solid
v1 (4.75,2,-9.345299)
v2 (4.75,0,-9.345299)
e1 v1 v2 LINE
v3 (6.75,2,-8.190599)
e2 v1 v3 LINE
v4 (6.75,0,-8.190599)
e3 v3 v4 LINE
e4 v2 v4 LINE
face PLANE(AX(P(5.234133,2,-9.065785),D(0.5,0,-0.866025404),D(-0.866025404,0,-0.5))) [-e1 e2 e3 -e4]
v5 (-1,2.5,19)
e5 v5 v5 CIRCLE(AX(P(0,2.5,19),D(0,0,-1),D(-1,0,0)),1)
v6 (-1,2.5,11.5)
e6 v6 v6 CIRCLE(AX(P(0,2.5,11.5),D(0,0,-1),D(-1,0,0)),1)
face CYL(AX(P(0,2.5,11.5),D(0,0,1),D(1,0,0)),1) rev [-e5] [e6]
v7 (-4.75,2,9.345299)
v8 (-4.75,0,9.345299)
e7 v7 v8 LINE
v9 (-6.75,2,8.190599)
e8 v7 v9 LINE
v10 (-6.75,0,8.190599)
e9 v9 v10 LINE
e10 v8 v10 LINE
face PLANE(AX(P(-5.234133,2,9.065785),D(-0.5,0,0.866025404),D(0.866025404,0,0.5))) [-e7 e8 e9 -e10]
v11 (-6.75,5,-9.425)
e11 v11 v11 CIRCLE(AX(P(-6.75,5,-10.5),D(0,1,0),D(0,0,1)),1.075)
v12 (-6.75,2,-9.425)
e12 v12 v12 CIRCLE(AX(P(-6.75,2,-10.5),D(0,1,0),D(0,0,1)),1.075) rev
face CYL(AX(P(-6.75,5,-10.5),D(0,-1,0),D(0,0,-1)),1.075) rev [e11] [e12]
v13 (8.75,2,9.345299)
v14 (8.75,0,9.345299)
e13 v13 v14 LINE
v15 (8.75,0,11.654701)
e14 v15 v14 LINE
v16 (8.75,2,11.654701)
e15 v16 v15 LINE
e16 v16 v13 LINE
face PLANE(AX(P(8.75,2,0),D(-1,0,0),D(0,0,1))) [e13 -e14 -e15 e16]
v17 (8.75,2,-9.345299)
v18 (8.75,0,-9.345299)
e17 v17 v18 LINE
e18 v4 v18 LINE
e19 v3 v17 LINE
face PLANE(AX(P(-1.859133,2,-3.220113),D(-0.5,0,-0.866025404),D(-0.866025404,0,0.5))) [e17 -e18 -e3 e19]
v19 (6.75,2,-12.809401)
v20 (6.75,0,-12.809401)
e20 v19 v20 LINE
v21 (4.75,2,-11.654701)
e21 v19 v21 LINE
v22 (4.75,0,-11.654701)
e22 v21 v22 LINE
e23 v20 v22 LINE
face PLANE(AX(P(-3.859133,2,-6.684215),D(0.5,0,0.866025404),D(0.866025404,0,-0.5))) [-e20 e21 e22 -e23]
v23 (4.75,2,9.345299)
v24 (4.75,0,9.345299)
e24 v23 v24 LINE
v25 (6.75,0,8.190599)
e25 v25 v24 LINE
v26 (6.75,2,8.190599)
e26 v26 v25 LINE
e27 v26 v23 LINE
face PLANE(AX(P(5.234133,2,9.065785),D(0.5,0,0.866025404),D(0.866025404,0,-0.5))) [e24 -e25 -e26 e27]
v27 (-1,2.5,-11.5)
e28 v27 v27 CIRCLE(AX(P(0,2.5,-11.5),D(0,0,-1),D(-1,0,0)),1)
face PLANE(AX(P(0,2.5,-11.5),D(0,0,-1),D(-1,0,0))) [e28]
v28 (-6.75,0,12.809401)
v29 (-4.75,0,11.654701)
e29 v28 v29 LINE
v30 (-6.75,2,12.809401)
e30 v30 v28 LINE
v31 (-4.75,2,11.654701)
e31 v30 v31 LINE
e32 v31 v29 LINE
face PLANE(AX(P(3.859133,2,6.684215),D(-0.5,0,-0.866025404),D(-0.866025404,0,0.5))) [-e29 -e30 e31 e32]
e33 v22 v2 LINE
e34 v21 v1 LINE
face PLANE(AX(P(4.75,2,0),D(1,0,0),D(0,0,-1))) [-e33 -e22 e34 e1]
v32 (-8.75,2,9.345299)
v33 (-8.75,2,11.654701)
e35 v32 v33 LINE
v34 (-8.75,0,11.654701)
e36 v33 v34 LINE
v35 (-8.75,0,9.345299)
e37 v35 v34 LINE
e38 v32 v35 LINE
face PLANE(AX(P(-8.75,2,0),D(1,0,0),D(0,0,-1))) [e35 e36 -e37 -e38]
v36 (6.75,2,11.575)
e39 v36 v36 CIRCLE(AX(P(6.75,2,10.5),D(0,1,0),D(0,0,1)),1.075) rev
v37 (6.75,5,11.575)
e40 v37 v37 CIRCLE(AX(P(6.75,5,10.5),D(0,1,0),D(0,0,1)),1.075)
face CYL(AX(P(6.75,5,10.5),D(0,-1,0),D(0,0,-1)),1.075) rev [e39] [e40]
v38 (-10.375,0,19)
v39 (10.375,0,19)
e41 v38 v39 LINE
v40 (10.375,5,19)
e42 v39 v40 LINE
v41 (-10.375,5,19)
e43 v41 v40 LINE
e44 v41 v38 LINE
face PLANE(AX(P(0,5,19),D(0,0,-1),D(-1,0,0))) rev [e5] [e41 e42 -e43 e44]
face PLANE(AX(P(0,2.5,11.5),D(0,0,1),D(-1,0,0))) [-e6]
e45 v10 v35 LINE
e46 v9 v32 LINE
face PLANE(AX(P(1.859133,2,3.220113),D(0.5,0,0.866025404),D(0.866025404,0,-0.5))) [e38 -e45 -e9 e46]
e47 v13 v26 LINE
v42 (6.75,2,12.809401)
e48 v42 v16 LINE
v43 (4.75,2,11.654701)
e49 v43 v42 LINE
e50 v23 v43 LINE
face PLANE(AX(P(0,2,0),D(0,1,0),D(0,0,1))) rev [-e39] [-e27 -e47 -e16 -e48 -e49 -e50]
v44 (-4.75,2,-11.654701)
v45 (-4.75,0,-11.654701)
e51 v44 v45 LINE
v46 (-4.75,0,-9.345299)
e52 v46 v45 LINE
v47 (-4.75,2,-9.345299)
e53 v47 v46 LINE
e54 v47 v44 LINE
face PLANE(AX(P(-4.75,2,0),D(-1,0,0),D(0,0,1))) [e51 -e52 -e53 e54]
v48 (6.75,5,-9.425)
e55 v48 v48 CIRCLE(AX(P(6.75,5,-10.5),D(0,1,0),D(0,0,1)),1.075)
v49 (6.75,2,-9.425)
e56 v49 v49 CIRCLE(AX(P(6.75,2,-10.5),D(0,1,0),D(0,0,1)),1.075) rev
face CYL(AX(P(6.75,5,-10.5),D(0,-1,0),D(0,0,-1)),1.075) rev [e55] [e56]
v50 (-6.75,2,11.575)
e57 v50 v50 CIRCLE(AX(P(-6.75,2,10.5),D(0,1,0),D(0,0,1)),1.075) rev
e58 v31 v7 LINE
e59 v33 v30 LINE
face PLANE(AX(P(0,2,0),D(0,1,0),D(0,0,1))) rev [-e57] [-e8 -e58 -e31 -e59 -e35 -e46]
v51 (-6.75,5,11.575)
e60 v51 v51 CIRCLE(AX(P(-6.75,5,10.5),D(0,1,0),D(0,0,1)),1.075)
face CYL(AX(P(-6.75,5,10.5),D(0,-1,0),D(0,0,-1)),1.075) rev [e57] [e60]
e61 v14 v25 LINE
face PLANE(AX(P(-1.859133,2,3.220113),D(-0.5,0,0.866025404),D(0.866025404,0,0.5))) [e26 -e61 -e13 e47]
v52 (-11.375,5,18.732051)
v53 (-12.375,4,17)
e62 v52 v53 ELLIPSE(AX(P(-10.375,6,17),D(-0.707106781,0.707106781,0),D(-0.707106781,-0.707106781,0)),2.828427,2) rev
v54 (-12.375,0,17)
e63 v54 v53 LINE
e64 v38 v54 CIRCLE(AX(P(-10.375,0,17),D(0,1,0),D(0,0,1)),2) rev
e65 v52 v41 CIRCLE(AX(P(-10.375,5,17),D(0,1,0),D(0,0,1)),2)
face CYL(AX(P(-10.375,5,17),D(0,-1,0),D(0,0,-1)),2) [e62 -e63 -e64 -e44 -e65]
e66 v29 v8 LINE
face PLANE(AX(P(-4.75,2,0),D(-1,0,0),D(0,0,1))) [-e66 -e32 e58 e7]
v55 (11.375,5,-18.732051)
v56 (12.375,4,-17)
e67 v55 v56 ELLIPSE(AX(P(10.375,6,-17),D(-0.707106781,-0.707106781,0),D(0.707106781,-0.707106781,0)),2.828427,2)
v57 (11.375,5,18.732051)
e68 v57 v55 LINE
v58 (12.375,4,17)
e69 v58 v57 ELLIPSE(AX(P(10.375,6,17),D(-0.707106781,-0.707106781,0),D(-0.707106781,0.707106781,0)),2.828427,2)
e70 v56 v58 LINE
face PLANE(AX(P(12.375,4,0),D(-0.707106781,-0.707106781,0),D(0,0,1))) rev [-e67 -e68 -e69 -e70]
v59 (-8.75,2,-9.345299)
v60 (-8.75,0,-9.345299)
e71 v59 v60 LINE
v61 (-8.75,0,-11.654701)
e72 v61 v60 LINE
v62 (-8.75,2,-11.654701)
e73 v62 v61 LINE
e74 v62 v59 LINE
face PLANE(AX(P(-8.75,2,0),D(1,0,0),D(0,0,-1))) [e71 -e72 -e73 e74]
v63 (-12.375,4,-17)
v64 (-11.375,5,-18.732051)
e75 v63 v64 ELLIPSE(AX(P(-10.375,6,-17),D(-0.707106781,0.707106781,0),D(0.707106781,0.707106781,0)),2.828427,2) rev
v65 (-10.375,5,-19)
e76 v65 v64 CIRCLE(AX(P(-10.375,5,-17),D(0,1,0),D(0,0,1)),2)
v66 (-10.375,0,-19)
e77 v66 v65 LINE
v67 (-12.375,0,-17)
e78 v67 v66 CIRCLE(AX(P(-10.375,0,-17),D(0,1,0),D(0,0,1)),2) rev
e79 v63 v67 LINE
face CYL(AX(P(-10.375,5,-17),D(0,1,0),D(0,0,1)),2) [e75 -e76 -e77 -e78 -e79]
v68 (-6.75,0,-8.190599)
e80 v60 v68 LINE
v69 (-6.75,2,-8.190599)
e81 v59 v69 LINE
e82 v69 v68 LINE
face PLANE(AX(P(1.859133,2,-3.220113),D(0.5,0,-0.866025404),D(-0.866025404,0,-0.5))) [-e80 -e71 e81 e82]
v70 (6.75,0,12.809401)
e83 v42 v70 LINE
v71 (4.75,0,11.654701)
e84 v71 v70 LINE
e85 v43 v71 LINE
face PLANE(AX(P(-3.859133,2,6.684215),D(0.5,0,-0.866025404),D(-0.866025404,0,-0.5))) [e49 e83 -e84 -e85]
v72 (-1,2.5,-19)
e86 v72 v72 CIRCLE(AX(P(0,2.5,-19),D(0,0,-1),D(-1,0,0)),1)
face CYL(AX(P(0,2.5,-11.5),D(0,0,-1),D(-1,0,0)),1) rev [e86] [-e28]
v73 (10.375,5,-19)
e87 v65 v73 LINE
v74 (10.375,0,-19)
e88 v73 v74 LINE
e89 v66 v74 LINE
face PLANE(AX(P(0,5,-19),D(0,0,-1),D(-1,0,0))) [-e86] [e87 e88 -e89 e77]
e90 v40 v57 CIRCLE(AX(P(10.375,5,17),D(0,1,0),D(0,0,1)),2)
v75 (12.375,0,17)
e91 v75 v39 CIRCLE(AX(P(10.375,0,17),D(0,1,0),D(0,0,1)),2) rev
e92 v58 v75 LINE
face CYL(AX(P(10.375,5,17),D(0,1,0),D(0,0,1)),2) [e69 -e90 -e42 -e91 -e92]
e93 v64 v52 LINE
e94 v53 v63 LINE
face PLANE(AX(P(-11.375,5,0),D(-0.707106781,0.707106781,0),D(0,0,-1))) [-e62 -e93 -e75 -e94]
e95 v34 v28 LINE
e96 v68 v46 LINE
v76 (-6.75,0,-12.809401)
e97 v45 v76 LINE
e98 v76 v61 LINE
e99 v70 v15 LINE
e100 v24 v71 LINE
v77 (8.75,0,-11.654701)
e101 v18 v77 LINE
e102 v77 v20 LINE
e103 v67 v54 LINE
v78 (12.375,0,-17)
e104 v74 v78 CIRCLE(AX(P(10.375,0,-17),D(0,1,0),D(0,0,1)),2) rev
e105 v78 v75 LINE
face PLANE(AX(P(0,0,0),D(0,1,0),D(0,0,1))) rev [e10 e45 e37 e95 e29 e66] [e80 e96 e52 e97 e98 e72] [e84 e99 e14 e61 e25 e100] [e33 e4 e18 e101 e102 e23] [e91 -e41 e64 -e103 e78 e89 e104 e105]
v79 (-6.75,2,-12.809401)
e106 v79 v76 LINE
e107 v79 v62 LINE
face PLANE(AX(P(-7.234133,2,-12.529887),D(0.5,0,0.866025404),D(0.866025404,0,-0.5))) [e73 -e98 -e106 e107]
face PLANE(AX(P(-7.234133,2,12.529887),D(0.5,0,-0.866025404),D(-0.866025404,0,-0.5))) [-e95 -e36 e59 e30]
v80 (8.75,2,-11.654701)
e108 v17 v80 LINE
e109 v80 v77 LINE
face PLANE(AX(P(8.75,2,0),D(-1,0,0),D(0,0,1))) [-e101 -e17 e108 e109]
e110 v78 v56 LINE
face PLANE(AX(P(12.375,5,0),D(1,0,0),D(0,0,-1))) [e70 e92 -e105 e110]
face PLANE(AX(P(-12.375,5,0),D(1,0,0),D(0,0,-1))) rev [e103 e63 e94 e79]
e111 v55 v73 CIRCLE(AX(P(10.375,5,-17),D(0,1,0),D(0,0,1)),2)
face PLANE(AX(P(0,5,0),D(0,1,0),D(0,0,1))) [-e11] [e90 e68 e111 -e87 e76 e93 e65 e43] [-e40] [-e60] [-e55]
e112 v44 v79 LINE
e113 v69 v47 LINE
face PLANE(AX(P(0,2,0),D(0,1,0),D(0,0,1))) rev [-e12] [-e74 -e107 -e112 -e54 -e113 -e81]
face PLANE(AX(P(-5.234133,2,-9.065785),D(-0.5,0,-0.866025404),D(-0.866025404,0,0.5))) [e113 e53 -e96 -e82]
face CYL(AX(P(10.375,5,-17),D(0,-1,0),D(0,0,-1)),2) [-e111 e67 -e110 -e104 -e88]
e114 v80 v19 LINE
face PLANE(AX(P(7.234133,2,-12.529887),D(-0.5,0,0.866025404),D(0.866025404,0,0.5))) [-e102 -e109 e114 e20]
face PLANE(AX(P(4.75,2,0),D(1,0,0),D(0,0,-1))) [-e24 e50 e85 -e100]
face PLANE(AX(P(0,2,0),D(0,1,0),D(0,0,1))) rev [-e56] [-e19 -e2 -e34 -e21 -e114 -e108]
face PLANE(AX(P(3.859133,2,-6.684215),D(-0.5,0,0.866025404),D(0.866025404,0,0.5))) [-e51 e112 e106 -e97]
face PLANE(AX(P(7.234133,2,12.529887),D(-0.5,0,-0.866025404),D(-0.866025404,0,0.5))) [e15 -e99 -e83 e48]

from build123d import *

# Parameters (mm, degrees)
BASE_W              = 24.75
BASE_H              = 38
BASE_R              = 1.075
BOSS_EXTRUDE1_DEPTH = 5
SKETCH1_3_R         = 1.075
CUT_EXTRUDE1_DEPTH  = 2
SKETCH1_5_R         = 1.075
CUT_EXTRUDE2_DEPTH  = 24.219401909
FILLET1_R           = 2
CHAMFER1_SIZE       = 1
MOUNT_HOLE_R        = 1
CUT_EXTRUDE3_DEPTH  = 7.5


with BuildPart() as part:
    # Base → Boss-Extrude1 (new body)
    # profile 1 of 9: a face of its own
    with BuildSketch(Plane(origin=(0, 0, 0), x_dir=(1, 0, 0), z_dir=(0, 1, 0))):
        Rectangle(BASE_W, BASE_H)
        Polygon((-6.75, -12.809401077), (-4.75, -11.654700538), (-4.75, -9.345299462), (-6.75, -8.190598923), (-8.75, -9.345299462), (-8.75, -11.654700538), align=None, mode=Mode.SUBTRACT)
        Polygon((6.75, -12.809401077), (8.75, -11.654700538), (8.75, -9.345299462), (6.75, -8.190598923), (4.75, -9.345299462), (4.75, -11.654700538), align=None, mode=Mode.SUBTRACT)
        Polygon((8.75, 9.345299462), (8.75, 11.654700538), (6.75, 12.809401077), (4.75, 11.654700538), (4.75, 9.345299462), (6.75, 8.190598923), align=None, mode=Mode.SUBTRACT)
        Polygon((-6.75, 8.190598923), (-4.75, 9.345299462), (-4.75, 11.654700538), (-6.75, 12.809401077), (-8.75, 11.654700538), (-8.75, 9.345299462), align=None, mode=Mode.SUBTRACT)
    # profile 2 of 9: a face of its own
    with BuildSketch(Plane(origin=(0, 0, 0), x_dir=(1, 0, 0), z_dir=(0, 1, 0))):
        Polygon((4.75, -11.654700538), (6.75, -12.809401077), (8.75, -11.654700538), (8.75, -9.345299462), (6.75, -8.190598923), (4.75, -9.345299462), align=None)
        with Locations((6.75, -10.5)):
            Circle(BASE_R, mode=Mode.SUBTRACT)
    # profile 3 of 9: a face of its own
    with BuildSketch(Plane(origin=(0, 0, 0), x_dir=(1, 0, 0), z_dir=(0, 1, 0))):
        with Locations((6.75, -10.5)):
            Circle(BASE_R)
    # profile 4 of 9: a face of its own
    with BuildSketch(Plane(origin=(0, 0, 0), x_dir=(1, 0, 0), z_dir=(0, 1, 0))):
        Polygon((6.75, 8.190598923), (8.75, 9.345299462), (8.75, 11.654700538), (6.75, 12.809401077), (4.75, 11.654700538), (4.75, 9.345299462), align=None)
        with Locations((6.75, 10.5)):
            Circle(BASE_R, mode=Mode.SUBTRACT)
    # profile 5 of 9: a face of its own
    with BuildSketch(Plane(origin=(0, 0, 0), x_dir=(1, 0, 0), z_dir=(0, 1, 0))):
        Polygon((-8.75, 9.345299462), (-6.75, 8.190598923), (-4.75, 9.345299462), (-4.75, 11.654700538), (-6.75, 12.809401077), (-8.75, 11.654700538), align=None)
        with Locations((-6.75, 10.5)):
            Circle(BASE_R, mode=Mode.SUBTRACT)
    # profile 6 of 9: a face of its own
    with BuildSketch(Plane(origin=(0, 0, 0), x_dir=(1, 0, 0), z_dir=(0, 1, 0))):
        with Locations((-6.75, 10.5)):
            Circle(BASE_R)
    # profile 7 of 9: a face of its own
    with BuildSketch(Plane(origin=(0, 0, 0), x_dir=(1, 0, 0), z_dir=(0, 1, 0))):
        with Locations((6.75, 10.5)):
            Circle(BASE_R)
    # profile 8 of 9: a face of its own
    with BuildSketch(Plane(origin=(0, 0, 0), x_dir=(1, 0, 0), z_dir=(0, 1, 0))):
        Polygon((-8.75, -11.654700538), (-6.75, -12.809401077), (-4.75, -11.654700538), (-4.75, -9.345299462), (-6.75, -8.190598923), (-8.75, -9.345299462), align=None)
        with Locations((-6.75, -10.5)):
            Circle(BASE_R, mode=Mode.SUBTRACT)
    # profile 9 of 9: a face of its own
    with BuildSketch(Plane(origin=(0, 0, 0), x_dir=(1, 0, 0), z_dir=(0, 1, 0))):
        with Locations((-6.75, -10.5)):
            Circle(BASE_R)
    extrude(amount=BOSS_EXTRUDE1_DEPTH)

    # Sketch1<3> → Cut-Extrude1 (cut)
    # profile 1 of 8: a face of its own
    with BuildSketch(Plane(origin=(0, 0, 0), x_dir=(1, 0, 0), z_dir=(0, 1, 0))):
        Polygon((-8.75, 9.345299462), (-6.75, 8.190598923), (-4.75, 9.345299462), (-4.75, 11.654700538), (-6.75, 12.809401077), (-8.75, 11.654700538), align=None)
        with Locations((-6.75, 10.5)):
            Circle(SKETCH1_3_R, mode=Mode.SUBTRACT)
    # profile 2 of 8: a face of its own
    with BuildSketch(Plane(origin=(0, 0, 0), x_dir=(1, 0, 0), z_dir=(0, 1, 0))):
        with Locations((-6.75, 10.5)):
            Circle(SKETCH1_3_R)
    # profile 3 of 8: a face of its own
    with BuildSketch(Plane(origin=(0, 0, 0), x_dir=(1, 0, 0), z_dir=(0, 1, 0))):
        Polygon((-8.75, -11.654700538), (-6.75, -12.809401077), (-4.75, -11.654700538), (-4.75, -9.345299462), (-6.75, -8.190598923), (-8.75, -9.345299462), align=None)
        with Locations((-6.75, -10.5)):
            Circle(SKETCH1_3_R, mode=Mode.SUBTRACT)
    # profile 4 of 8: a face of its own
    with BuildSketch(Plane(origin=(0, 0, 0), x_dir=(1, 0, 0), z_dir=(0, 1, 0))):
        with Locations((-6.75, -10.5)):
            Circle(SKETCH1_3_R)
    # profile 5 of 8: a face of its own
    with BuildSketch(Plane(origin=(0, 0, 0), x_dir=(1, 0, 0), z_dir=(0, 1, 0))):
        Polygon((4.75, -11.654700538), (6.75, -12.809401077), (8.75, -11.654700538), (8.75, -9.345299462), (6.75, -8.190598923), (4.75, -9.345299462), align=None)
        with Locations((6.75, -10.5)):
            Circle(SKETCH1_3_R, mode=Mode.SUBTRACT)
    # profile 6 of 8: a face of its own
    with BuildSketch(Plane(origin=(0, 0, 0), x_dir=(1, 0, 0), z_dir=(0, 1, 0))):
        with Locations((6.75, -10.5)):
            Circle(SKETCH1_3_R)
    # profile 7 of 8: a face of its own
    with BuildSketch(Plane(origin=(0, 0, 0), x_dir=(1, 0, 0), z_dir=(0, 1, 0))):
        Polygon((6.75, 8.190598923), (8.75, 9.345299462), (8.75, 11.654700538), (6.75, 12.809401077), (4.75, 11.654700538), (4.75, 9.345299462), align=None)
        with Locations((6.75, 10.5)):
            Circle(SKETCH1_3_R, mode=Mode.SUBTRACT)
    # profile 8 of 8: a face of its own
    with BuildSketch(Plane(origin=(0, 0, 0), x_dir=(1, 0, 0), z_dir=(0, 1, 0))):
        with Locations((6.75, 10.5)):
            Circle(SKETCH1_3_R)
    extrude(amount=CUT_EXTRUDE1_DEPTH, mode=Mode.SUBTRACT)

    # Sketch1<5> → Cut-Extrude2 (cut, through all)
    with BuildSketch(Plane(origin=(0, 0, 0), x_dir=(1, 0, 0), z_dir=(0, 1, 0))):
        with Locations(Location((6.75, 10.5, 0), (0, 0, 270))):
            Circle(SKETCH1_5_R)
        with Locations(Location((6.75, -10.5, 0), (0, 0, 270))):
            Circle(SKETCH1_5_R)
        with Locations(Location((-6.75, -10.5, 0), (0, 0, 270))):
            Circle(SKETCH1_5_R)
        with Locations(Location((-6.75, 10.5, 0), (0, 0, 270))):
            Circle(SKETCH1_5_R)
    extrude(amount=CUT_EXTRUDE2_DEPTH, mode=Mode.SUBTRACT)

    # Fillet1
    fillet1_edges = [part.edges().sort_by_distance(p)[0] for p in [
        (12.375, 2.5, 19),
        (-12.375, 2.5, 19),
        (-12.375, 2.5, -19),
        (12.375, 2.5, -19),
    ]]
    fillet(fillet1_edges, radius=FILLET1_R)

    # Chamfer1
    # the kernel refuses this chamfer: 1 mm, written as the material it takes off along each edge
    with BuildSketch(Plane(origin=(12.375, 5, -19.571682988), x_dir=(0.027495876610585623, -0.9996219169112968, 0), z_dir=(0, 0, 1))) as chamfer1_piece_1:
        Polygon((CHAMFER1_SIZE * 0.999621916911, -CHAMFER1_SIZE * 0.0274958766106), (-CHAMFER1_SIZE * 0.0274958766106, -CHAMFER1_SIZE * 0.999621916911), (0, 0), align=None)
    extrude(amount=39.143365976, mode=Mode.SUBTRACT)
    with BuildSketch(Plane(origin=(-12.375, 5, 19.571682988), x_dir=(0.9996219169112968, 0.02749587661058651, 0), z_dir=(0, 0, -1))) as chamfer1_piece_2:
        Polygon((CHAMFER1_SIZE * 0.999621916911, CHAMFER1_SIZE * 0.0274958766106), (-CHAMFER1_SIZE * 0.0274958766106, CHAMFER1_SIZE * 0.999621916911), (0, 0), align=None)
    extrude(amount=39.143365976, mode=Mode.SUBTRACT)

    # Mount_Hole → Cut-Extrude3 (cut)
    with BuildSketch(Plane(origin=(0, 0, -19), x_dir=(-1, 0, 0), z_dir=(0, 0, -1))):
        with Locations((0, 2.5)):
            Circle(MOUNT_HOLE_R)
    cut_extrude3 = extrude(amount=-CUT_EXTRUDE3_DEPTH, mode=Mode.SUBTRACT)

    # Mirror1: Cut-Extrude3 across plane
    add(cut_extrude3.mirror(Plane(origin=(0, 0, 0), x_dir=(1, 0, 0), z_dir=(0, 0, -1))), mode=Mode.SUBTRACT)


solid = part.part
